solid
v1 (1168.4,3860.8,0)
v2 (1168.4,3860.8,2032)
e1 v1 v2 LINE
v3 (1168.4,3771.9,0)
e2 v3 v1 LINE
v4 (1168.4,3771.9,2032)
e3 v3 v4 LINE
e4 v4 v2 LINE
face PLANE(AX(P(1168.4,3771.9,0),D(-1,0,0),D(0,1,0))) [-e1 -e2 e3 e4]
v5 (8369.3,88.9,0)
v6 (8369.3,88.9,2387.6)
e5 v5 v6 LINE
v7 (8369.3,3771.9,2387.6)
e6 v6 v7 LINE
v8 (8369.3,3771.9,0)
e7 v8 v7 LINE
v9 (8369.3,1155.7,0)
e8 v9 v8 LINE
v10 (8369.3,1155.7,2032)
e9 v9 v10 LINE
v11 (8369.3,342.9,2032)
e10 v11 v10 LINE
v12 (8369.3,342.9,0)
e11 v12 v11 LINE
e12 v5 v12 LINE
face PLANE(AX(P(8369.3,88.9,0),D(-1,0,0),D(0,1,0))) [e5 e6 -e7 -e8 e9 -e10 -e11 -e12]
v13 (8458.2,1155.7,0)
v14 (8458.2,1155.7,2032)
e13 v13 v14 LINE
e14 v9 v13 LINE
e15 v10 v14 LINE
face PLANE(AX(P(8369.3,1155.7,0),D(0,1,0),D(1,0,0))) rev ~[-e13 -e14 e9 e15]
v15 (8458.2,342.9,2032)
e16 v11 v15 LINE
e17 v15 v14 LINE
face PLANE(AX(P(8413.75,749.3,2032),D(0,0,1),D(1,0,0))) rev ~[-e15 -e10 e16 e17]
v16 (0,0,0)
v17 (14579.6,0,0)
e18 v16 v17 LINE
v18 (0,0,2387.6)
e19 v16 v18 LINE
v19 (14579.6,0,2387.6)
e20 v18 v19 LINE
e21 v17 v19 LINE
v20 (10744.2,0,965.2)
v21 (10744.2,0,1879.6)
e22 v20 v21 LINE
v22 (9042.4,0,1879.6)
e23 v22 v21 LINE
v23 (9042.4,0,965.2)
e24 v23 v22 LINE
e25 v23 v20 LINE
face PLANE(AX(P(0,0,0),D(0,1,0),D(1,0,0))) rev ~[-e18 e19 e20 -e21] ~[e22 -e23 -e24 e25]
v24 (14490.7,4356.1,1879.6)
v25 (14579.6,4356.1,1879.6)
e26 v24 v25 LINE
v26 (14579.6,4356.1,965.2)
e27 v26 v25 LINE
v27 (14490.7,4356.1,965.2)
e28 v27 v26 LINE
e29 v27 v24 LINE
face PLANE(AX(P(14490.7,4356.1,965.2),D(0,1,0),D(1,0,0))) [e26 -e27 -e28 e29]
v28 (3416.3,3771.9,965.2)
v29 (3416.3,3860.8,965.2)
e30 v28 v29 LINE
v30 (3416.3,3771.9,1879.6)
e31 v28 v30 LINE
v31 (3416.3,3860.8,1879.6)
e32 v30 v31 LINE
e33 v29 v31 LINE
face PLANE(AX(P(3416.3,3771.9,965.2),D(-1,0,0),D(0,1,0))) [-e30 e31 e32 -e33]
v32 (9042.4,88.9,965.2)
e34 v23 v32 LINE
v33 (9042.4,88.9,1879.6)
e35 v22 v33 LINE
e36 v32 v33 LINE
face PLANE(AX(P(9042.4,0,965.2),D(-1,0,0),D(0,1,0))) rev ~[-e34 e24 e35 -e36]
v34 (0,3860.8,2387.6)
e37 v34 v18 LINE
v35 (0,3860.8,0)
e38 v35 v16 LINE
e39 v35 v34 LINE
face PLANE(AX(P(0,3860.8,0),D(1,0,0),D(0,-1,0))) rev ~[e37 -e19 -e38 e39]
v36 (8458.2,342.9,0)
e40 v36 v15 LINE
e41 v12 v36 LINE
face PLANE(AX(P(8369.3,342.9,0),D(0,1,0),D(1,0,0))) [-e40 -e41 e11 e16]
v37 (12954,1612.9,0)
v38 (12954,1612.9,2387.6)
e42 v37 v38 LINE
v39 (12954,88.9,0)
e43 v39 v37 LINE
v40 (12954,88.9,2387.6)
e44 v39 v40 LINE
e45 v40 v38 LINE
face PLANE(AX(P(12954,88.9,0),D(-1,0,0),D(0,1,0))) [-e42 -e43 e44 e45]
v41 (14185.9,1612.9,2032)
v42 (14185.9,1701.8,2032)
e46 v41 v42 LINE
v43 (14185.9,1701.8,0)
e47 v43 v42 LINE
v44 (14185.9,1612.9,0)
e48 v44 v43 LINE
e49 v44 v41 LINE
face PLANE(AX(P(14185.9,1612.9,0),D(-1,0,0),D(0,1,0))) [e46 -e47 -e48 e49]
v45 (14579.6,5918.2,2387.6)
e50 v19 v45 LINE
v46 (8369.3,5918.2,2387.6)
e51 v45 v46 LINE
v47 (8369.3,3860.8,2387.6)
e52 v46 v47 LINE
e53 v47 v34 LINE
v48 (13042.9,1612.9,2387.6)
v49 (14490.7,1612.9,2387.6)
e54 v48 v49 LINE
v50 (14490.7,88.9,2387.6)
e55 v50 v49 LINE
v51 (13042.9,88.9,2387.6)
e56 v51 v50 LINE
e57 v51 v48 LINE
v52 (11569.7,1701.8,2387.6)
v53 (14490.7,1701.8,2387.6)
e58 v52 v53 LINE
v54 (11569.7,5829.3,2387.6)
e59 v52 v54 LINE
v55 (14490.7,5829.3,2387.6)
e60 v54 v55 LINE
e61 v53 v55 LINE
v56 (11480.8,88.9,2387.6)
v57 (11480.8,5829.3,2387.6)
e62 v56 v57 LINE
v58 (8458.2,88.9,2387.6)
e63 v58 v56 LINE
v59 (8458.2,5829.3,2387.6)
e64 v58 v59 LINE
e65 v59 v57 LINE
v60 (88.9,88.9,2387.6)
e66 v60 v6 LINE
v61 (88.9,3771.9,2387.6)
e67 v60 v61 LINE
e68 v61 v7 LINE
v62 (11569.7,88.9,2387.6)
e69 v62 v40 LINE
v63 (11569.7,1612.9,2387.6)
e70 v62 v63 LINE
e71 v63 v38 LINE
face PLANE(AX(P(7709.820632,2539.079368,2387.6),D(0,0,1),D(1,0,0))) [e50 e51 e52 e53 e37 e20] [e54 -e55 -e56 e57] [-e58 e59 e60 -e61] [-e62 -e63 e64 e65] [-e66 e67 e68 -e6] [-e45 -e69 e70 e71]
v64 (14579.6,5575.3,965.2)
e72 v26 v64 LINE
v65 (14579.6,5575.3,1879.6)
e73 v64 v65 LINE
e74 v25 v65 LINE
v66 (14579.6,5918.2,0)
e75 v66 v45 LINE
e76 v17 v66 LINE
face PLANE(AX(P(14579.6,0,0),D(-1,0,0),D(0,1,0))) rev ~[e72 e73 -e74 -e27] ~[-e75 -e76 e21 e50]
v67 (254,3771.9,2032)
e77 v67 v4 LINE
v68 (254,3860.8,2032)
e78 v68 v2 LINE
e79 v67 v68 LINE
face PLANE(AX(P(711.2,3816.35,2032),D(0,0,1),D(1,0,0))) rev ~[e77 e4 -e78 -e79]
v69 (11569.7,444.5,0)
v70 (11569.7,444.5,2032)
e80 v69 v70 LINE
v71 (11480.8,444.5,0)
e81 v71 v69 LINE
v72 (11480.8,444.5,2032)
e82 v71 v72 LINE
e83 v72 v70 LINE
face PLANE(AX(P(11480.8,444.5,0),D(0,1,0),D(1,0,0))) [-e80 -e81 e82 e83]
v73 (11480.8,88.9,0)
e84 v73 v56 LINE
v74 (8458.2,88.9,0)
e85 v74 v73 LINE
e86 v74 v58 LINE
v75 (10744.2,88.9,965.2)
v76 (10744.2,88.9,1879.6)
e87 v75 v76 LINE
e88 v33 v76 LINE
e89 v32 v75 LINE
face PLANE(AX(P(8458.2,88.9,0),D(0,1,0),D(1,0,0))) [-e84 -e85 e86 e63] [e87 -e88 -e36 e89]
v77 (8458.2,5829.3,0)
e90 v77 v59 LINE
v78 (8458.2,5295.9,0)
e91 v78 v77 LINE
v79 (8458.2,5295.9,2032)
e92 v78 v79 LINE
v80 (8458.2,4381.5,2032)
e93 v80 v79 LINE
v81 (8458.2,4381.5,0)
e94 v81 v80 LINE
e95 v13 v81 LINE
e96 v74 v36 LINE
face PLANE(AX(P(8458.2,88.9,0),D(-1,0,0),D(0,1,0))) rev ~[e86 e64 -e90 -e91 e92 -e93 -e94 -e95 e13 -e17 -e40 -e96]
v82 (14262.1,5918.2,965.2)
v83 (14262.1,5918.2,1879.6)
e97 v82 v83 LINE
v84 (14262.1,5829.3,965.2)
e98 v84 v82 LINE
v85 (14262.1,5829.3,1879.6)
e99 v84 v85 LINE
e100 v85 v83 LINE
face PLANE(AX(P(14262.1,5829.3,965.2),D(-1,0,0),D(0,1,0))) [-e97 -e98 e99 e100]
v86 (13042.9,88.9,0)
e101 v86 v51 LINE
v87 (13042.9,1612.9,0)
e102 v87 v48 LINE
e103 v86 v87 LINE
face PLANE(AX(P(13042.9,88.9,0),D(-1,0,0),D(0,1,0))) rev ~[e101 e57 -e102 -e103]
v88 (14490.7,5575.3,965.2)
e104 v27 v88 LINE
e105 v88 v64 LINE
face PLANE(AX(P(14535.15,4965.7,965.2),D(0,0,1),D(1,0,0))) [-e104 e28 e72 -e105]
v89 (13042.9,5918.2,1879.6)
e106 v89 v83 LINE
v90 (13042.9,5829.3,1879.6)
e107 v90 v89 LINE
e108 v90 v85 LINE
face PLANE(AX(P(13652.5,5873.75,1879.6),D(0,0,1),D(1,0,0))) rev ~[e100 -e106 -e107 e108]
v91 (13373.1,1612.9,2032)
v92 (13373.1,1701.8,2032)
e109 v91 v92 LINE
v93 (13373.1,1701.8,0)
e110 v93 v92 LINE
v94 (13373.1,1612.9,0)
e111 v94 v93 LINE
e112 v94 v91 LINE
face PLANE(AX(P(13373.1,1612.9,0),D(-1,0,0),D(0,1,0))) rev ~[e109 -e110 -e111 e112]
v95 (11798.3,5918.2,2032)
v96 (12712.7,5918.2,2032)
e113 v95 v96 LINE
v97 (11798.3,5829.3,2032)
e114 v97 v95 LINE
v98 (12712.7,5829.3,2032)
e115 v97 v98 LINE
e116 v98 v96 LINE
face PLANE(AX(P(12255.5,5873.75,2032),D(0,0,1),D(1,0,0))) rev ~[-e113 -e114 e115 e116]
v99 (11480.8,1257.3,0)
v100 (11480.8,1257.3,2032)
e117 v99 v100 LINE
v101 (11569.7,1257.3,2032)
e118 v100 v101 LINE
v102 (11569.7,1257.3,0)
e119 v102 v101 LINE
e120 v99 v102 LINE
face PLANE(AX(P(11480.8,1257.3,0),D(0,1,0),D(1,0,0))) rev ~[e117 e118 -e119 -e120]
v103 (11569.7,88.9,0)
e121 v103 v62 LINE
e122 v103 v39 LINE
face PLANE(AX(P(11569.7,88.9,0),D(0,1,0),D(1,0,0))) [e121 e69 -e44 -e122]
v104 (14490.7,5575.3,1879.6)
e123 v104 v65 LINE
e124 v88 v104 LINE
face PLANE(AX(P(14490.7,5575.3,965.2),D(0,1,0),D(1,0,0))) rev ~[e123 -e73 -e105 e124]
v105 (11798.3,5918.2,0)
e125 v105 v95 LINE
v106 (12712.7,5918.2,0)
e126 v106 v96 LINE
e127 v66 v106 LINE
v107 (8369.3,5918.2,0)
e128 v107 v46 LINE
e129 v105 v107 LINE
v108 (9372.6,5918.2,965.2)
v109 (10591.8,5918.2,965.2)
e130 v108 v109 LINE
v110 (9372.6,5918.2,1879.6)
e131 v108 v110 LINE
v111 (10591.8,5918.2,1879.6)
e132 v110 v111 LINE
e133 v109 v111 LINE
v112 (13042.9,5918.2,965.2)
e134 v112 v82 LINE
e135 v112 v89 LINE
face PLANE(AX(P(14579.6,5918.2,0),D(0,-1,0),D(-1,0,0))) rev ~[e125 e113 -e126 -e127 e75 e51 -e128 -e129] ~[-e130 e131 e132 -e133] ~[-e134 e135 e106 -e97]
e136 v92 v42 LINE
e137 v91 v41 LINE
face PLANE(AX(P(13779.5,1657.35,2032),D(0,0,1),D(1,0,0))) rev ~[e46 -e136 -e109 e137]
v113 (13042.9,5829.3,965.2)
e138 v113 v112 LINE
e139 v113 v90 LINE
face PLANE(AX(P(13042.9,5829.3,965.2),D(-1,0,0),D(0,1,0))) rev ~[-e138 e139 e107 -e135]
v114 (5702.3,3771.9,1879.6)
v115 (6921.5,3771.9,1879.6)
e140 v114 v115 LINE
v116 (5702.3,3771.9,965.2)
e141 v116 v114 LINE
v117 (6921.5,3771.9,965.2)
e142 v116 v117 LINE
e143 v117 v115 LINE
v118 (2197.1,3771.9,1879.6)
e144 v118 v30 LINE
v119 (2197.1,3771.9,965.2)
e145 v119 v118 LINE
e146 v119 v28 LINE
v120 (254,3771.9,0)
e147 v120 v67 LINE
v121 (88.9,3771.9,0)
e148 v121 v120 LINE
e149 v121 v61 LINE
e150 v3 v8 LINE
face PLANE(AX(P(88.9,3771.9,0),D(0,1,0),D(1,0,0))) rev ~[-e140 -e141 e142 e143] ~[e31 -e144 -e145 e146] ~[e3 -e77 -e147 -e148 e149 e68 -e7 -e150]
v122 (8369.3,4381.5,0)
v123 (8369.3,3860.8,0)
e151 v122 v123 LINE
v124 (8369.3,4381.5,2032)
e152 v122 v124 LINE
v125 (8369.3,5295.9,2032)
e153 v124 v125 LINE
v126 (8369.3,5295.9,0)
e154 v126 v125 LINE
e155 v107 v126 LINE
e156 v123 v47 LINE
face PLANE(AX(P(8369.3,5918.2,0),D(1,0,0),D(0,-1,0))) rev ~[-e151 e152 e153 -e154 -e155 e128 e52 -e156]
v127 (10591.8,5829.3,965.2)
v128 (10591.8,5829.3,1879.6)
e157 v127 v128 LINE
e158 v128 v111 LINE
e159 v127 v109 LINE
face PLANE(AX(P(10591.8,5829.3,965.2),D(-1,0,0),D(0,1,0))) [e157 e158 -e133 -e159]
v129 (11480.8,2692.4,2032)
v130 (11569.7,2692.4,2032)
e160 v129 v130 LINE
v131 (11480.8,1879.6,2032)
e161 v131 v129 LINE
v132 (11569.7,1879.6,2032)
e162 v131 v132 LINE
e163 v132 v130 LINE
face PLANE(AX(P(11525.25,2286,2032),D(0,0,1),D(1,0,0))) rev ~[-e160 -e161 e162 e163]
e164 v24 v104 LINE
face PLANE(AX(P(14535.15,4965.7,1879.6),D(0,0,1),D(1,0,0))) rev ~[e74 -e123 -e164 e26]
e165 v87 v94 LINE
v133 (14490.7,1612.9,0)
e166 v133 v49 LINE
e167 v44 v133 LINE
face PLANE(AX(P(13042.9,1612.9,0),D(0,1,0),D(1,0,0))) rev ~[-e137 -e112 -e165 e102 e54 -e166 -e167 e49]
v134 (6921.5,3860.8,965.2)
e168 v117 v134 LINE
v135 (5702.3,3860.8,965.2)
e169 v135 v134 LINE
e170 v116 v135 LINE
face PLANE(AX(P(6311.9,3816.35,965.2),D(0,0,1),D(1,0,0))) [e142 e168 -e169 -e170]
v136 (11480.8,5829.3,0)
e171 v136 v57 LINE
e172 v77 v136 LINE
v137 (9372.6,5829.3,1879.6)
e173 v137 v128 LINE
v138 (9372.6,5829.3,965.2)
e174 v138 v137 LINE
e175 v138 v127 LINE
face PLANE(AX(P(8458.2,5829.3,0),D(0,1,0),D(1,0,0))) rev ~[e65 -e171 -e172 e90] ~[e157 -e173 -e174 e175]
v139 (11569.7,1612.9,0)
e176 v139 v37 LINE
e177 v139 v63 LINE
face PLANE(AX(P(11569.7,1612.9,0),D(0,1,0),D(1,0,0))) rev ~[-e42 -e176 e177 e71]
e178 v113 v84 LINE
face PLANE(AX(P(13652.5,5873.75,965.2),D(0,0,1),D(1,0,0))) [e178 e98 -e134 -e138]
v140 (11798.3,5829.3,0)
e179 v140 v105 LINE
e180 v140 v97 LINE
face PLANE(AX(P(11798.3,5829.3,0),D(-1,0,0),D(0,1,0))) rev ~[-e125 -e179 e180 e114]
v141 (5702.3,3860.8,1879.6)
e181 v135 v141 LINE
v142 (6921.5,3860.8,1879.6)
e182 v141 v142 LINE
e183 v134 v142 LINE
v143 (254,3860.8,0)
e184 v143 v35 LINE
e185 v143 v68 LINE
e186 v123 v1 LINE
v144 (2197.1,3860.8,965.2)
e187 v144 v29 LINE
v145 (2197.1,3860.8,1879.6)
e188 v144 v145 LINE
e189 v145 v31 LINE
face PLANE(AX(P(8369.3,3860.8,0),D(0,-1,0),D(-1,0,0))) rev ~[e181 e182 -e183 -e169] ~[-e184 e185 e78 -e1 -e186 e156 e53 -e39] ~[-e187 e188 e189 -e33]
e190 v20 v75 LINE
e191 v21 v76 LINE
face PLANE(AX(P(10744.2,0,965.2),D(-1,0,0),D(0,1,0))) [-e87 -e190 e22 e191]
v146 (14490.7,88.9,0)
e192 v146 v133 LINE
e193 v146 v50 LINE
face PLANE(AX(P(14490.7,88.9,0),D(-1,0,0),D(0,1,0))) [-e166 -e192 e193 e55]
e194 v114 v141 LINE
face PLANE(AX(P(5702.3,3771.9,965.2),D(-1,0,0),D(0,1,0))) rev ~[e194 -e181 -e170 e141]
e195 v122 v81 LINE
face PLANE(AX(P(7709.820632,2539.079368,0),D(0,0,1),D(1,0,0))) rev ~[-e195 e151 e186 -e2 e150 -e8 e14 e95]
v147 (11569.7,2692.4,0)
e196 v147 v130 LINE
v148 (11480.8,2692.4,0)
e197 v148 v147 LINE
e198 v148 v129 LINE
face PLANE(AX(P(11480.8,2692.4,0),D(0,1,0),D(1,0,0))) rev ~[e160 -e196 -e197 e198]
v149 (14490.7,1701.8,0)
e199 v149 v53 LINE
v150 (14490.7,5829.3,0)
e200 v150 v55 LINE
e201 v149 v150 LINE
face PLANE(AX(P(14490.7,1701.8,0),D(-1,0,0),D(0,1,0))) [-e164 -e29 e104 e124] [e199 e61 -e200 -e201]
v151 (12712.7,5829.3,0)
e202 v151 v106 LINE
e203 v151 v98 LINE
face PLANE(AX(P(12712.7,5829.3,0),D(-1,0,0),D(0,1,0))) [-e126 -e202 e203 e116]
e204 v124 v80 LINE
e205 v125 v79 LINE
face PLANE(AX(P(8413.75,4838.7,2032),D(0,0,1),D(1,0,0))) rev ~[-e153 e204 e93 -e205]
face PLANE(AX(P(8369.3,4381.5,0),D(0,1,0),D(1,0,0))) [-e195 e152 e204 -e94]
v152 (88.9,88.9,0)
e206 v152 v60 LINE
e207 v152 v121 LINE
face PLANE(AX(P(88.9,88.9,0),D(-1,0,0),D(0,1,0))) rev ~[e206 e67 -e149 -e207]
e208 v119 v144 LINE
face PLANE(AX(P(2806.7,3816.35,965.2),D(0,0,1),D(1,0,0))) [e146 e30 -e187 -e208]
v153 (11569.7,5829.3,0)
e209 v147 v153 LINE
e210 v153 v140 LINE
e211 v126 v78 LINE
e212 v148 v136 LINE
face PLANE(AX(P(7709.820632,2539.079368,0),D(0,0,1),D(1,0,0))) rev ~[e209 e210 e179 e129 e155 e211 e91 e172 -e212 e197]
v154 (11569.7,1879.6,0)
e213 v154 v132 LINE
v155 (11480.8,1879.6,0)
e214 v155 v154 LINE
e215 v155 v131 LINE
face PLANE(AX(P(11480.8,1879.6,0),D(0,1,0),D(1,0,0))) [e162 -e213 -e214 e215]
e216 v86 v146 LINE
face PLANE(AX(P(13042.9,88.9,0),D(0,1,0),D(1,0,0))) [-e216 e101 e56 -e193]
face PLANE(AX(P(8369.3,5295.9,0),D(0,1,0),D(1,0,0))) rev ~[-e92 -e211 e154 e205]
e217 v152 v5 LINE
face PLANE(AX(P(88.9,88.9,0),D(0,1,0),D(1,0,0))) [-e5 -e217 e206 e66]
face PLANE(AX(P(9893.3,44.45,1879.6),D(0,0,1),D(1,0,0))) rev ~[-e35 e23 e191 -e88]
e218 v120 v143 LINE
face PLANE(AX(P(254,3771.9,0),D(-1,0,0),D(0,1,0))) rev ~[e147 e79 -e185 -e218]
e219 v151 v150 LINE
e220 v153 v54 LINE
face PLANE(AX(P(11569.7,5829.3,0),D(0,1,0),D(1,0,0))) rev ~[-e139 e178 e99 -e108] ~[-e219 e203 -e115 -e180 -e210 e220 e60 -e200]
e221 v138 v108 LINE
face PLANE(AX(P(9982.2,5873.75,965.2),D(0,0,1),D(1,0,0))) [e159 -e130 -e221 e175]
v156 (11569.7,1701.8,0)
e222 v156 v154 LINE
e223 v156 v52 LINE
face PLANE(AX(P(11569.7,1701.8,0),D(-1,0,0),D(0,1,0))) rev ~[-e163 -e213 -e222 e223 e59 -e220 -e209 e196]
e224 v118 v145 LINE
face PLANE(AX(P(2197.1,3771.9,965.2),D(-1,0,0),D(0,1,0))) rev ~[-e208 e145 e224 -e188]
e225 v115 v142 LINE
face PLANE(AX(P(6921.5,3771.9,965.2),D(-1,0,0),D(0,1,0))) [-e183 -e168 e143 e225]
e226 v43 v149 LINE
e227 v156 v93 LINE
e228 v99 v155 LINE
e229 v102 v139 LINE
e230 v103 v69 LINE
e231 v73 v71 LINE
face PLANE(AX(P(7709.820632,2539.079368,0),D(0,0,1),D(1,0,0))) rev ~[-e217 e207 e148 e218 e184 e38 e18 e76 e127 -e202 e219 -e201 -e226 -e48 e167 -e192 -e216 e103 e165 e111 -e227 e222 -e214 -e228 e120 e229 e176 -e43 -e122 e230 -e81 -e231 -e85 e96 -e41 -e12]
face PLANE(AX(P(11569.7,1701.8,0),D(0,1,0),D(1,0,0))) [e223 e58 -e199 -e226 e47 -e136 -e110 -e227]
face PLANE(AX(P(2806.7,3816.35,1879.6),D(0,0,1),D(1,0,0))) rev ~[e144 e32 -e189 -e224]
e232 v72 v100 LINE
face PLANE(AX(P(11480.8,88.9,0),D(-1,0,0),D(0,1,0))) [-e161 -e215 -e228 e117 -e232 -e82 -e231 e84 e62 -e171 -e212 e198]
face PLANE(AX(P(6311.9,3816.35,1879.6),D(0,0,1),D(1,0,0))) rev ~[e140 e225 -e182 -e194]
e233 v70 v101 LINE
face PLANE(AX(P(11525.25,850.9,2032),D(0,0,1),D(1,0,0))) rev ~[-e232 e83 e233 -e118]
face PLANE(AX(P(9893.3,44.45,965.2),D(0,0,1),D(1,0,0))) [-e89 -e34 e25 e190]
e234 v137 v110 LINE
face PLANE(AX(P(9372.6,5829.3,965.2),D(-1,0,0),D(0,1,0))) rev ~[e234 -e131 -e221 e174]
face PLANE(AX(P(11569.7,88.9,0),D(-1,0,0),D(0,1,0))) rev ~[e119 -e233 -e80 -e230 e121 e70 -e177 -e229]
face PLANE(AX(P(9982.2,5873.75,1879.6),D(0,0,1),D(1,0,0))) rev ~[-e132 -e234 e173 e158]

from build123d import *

# Parameters (mm, degrees)
F0_W     = 8280.4
F0_H     = 3683
F0_W_2   = 1384.3
F0_H_2   = 1524
F0_W_3   = 1447.8
F0_W_4   = 3022.6
F0_H_3   = 5740.4
F0_W_5   = 2921
F0_H_4   = 4127.5
F1_DEPTH = 2387.6
F2_W     = 914.4
F2_H     = 88.9
F2_W_2   = 88.9
F2_H_2   = 812.8
F2_H_3   = 914.4
F2_W_3   = 812.8
F3_DEPTH = 2032
F5_W     = 1219.2
F5_H     = 88.9
F5_W_2   = 88.9
F5_H_2   = 1219.2
F5_W_3   = 1701.8
F7_DEPTH = 914.4


# Not quite as in the source:
# - a feature of the source that left no trace in its solid (it failed there, or was rolled back) is left out


with BuildPart() as f1:
    # F0 (on Top) → F1 (new body)
    with BuildSketch(Plane.XY):
        Polygon((0, 3860.8), (0, 0), (14579.6, 0), (14579.6, 5918.2), (8369.3, 5918.2), (8369.3, 3860.8), align=None)
        with Locations((4229.1, 1930.4)):
            Rectangle(F0_W, F0_H, mode=Mode.SUBTRACT)
        with Locations((12261.85, 850.9)):
            Rectangle(F0_W_2, F0_H_2, mode=Mode.SUBTRACT)
        with Locations((13766.8, 850.9)):
            Rectangle(F0_W_3, F0_H_2, mode=Mode.SUBTRACT)
        with Locations((9969.5, 2959.1)):
            Rectangle(F0_W_4, F0_H_3, mode=Mode.SUBTRACT)
        with Locations((13030.2, 3765.55)):
            Rectangle(F0_W_5, F0_H_4, mode=Mode.SUBTRACT)
    extrude(amount=F1_DEPTH)

    # F2 (on Top) → F3 (cut)
    with BuildSketch(Plane.XY):
        with Locations((711.2, 3816.35)):
            Rectangle(F2_W, F2_H)
        with Locations((8413.75, 749.3)):
            Rectangle(F2_W_2, F2_H_2)
        with Locations((8413.75, 4838.7)):
            Rectangle(F2_W_2, F2_H_3)
        with Locations((12255.5, 5873.75)):
            Rectangle(F2_W, F2_H)
        with Locations((11525.25, 850.9)):
            Rectangle(F2_W_2, F2_H_2)
        with Locations((13779.5, 1657.35)):
            Rectangle(F2_W_3, F2_H)
        with Locations((11525.25, 2286)):
            Rectangle(F2_W_2, F2_H_2)
    extrude(amount=F3_DEPTH, mode=Mode.SUBTRACT)

    # F5 (on offset) → F7 (cut, through all)
    with BuildSketch(Plane.XY.offset(965.2)):
        with Locations((2806.7, 3816.35)):
            Rectangle(F5_W, F5_H)
        with Locations((6311.9, 3816.35)):
            Rectangle(F5_W, F5_H)
        with Locations((9982.2, 5873.75)):
            Rectangle(F5_W, F5_H)
        with Locations((13652.5, 5873.75)):
            Rectangle(F5_W, F5_H)
        with Locations((14535.15, 4965.7)):
            Rectangle(F5_W_2, F5_H_2)
        with Locations((9893.3, 44.45)):
            Rectangle(F5_W_3, F5_H)
    extrude(amount=F7_DEPTH, mode=Mode.SUBTRACT)


solid = f1.part
